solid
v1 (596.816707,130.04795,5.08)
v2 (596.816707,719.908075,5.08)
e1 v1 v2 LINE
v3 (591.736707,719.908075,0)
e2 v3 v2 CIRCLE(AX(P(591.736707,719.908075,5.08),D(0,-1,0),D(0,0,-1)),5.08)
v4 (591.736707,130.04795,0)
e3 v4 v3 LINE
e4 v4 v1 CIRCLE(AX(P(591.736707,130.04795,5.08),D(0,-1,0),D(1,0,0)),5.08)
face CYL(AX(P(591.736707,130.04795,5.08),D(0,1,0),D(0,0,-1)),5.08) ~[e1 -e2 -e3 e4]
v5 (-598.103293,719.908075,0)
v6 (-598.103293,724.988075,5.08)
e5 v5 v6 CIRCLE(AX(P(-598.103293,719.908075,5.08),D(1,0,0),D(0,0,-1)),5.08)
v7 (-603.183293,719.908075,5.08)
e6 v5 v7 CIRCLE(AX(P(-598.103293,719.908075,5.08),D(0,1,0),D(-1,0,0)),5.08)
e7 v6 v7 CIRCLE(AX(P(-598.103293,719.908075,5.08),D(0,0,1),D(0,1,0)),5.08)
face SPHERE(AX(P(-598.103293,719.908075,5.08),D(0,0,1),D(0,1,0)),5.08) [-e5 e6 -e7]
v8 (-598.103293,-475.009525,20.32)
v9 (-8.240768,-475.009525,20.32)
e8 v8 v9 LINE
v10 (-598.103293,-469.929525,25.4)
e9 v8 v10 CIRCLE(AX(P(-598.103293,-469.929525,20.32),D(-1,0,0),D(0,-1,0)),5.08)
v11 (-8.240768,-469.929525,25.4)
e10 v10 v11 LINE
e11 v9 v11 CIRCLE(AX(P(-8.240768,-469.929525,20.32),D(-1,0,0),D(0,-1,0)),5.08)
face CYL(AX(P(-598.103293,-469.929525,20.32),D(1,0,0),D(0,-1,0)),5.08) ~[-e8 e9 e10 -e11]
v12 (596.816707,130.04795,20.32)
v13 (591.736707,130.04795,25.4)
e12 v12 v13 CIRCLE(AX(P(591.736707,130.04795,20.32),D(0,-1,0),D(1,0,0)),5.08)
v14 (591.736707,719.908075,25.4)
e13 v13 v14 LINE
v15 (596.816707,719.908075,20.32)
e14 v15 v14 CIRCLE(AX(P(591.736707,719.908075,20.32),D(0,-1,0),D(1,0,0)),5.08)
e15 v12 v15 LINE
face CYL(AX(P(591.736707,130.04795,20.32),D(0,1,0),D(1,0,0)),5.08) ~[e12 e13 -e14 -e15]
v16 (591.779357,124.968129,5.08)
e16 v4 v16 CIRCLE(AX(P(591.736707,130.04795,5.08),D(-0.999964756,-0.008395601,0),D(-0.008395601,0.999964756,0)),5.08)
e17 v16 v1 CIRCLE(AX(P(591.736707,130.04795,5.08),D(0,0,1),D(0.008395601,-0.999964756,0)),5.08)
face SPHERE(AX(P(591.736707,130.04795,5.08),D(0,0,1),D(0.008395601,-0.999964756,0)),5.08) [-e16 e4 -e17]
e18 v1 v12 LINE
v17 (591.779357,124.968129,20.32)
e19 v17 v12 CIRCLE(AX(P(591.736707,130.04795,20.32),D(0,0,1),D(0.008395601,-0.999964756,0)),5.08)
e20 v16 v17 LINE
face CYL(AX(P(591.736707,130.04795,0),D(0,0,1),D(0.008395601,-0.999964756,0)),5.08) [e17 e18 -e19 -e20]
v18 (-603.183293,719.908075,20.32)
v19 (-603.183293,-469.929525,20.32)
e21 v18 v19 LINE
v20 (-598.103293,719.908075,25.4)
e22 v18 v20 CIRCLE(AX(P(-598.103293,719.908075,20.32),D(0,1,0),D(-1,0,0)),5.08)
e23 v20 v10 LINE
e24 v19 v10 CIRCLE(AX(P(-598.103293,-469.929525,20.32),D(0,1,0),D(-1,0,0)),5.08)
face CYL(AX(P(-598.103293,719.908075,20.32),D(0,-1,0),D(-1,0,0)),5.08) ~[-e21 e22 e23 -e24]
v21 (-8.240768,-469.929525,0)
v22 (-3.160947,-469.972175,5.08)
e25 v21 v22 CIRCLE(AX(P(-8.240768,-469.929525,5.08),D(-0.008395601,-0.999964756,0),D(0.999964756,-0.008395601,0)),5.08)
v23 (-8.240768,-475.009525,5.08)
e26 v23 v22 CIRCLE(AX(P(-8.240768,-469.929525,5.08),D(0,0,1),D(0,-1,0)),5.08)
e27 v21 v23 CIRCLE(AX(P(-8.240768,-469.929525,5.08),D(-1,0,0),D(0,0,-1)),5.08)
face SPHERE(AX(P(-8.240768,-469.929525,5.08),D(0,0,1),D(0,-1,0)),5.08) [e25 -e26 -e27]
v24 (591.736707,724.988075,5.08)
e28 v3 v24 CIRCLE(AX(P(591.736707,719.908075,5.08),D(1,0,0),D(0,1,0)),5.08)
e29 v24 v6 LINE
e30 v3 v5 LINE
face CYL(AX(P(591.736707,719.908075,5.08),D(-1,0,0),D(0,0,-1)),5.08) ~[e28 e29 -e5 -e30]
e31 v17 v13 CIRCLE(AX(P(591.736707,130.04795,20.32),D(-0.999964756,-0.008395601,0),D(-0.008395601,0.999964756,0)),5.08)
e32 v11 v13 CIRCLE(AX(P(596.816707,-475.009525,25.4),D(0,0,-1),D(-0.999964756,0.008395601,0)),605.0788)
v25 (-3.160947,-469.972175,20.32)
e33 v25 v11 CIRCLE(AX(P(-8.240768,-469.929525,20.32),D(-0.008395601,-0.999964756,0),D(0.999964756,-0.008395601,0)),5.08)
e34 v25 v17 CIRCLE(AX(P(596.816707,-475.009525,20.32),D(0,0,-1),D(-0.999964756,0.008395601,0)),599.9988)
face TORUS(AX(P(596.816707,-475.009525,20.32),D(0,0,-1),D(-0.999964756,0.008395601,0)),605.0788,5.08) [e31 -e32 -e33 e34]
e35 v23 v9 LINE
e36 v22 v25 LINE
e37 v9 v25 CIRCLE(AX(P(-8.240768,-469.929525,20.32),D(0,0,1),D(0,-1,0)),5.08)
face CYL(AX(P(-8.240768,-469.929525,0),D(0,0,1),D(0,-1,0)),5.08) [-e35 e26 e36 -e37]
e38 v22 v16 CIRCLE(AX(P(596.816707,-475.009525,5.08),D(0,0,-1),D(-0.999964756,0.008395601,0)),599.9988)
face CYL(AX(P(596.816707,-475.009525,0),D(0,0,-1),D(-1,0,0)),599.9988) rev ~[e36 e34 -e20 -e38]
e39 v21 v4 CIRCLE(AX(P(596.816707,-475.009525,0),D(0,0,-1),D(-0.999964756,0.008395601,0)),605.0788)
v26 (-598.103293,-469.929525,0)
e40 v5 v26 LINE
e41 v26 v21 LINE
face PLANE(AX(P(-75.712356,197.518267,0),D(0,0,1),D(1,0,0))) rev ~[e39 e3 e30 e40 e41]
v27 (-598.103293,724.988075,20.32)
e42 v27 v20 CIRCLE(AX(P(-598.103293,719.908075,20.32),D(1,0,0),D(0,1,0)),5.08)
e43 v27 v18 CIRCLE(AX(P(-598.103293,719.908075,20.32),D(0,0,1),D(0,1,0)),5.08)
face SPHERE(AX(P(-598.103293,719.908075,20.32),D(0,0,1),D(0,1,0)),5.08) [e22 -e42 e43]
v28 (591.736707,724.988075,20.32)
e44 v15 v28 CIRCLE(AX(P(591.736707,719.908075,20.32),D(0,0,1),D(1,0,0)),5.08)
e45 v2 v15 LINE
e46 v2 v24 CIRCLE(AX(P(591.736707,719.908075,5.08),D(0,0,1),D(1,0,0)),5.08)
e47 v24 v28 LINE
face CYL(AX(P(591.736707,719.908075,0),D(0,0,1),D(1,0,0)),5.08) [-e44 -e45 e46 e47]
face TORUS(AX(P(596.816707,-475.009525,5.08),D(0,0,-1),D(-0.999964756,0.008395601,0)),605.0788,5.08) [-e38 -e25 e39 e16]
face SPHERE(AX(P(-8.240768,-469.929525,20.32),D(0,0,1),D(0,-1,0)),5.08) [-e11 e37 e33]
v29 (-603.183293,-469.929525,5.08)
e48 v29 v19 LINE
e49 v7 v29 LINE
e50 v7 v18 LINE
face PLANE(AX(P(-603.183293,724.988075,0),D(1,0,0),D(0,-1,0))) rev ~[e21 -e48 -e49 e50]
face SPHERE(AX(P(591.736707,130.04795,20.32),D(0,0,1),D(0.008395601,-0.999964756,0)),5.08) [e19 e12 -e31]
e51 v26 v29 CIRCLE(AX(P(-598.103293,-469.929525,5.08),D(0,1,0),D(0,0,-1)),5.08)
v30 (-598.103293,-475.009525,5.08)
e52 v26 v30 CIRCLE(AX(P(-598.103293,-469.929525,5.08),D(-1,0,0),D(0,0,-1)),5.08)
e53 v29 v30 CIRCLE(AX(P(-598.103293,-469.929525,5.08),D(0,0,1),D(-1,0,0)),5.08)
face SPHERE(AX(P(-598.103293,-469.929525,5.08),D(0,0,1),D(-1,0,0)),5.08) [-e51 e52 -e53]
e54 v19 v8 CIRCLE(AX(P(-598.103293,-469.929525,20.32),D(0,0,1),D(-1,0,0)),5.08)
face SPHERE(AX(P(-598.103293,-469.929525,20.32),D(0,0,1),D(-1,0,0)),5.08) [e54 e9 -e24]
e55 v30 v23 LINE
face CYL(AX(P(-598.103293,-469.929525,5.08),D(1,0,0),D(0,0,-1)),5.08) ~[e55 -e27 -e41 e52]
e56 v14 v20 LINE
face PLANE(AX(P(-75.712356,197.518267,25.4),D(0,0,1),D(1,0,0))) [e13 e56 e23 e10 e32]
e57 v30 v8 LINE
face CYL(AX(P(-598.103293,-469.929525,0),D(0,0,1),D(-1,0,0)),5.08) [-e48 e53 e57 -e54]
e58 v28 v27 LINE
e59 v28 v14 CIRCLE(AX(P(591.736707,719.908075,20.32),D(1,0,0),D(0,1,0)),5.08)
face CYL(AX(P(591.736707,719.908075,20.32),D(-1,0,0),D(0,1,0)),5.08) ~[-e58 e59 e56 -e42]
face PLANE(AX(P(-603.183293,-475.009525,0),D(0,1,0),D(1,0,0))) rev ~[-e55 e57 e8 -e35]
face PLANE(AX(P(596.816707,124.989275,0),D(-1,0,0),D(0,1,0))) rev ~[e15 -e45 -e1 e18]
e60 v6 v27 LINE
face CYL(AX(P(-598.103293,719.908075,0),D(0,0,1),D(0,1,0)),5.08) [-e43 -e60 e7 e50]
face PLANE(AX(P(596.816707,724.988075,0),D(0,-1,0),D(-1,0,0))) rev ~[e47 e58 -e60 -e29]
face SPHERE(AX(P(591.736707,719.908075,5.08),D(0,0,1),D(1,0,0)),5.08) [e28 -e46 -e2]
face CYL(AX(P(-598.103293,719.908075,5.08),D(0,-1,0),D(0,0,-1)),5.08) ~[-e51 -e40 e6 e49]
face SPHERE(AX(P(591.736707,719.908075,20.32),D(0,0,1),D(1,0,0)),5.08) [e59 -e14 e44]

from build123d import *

# Parameters (mm, degrees)
F1_DEPTH = 25.4
F2_R     = 5.08
F3_R     = 5.08
F4_R     = 5.08
F5_R     = 5.08
F6_R     = 5.08
F9_R     = 5.08
F10_R    = 5.08


# Not quite as in the source:
# - the program builds the solid bodies; features that only make, move or delete a surface that nothing else refers to are left out


with BuildPart() as f1:
    # F0 (on Top) → F1 (new body)
    with BuildSketch(Plane.XY):
        with BuildLine():
            Line((596.8167068857, 124.9892751187), (596.8167068857, 724.9880751187))
            Line((596.8167068857, 724.9880751187), (-603.1832931143, 724.9880751187))
            Line((-603.1832931143, 724.9880751187), (-603.1832931143, -475.0095248813))
            Line((-603.1832931143, -475.0095248813), (-3.1820931143, -475.0095248813))
            ThreePointArc((-3.1820931143, -475.0095248813), (172.5534867019, -50.7463046975), (596.8167068857, 124.9892751187))
        make_face()
    extrude(amount=F1_DEPTH)

    # F2
    f2_edges = [f1.edges().sort_by_distance(p)[0] for p in [
        (-603.183293, -475.009525, 12.7),
    ]]
    fillet(f2_edges, radius=F2_R)

    # F3
    f3_edges = [f1.edges().sort_by_distance(p)[0] for p in [
        (-3.182093, -475.009525, 12.7),
    ]]
    fillet(f3_edges, radius=F3_R)

    # F4
    f4_edges = [f1.edges().sort_by_distance(p)[0] for p in [
        (596.816707, 124.989275, 12.7),
    ]]
    fillet(f4_edges, radius=F4_R)

    # F5
    f5_edges = [f1.edges().sort_by_distance(p)[0] for p in [
        (596.816707, 724.988075, 12.7),
    ]]
    fillet(f5_edges, radius=F5_R)

    # F6
    f6_edges = [f1.edges().sort_by_distance(p)[0] for p in [
        (-603.183293, 724.988075, 12.7),
    ]]
    fillet(f6_edges, radius=F6_R)

    # F9
    f9_edges = [f1.edges().sort_by_distance(p)[0] for p in [
        (-303.172031, -475.009525, 0),
    ]]
    fillet(f9_edges, radius=F9_R)

    # F10
    f10_edges = [f1.edges().sort_by_distance(p)[0] for p in [
        (-303.172031, -475.009525, 25.4),
    ]]
    fillet(f10_edges, radius=F10_R)


solid = f1.part
